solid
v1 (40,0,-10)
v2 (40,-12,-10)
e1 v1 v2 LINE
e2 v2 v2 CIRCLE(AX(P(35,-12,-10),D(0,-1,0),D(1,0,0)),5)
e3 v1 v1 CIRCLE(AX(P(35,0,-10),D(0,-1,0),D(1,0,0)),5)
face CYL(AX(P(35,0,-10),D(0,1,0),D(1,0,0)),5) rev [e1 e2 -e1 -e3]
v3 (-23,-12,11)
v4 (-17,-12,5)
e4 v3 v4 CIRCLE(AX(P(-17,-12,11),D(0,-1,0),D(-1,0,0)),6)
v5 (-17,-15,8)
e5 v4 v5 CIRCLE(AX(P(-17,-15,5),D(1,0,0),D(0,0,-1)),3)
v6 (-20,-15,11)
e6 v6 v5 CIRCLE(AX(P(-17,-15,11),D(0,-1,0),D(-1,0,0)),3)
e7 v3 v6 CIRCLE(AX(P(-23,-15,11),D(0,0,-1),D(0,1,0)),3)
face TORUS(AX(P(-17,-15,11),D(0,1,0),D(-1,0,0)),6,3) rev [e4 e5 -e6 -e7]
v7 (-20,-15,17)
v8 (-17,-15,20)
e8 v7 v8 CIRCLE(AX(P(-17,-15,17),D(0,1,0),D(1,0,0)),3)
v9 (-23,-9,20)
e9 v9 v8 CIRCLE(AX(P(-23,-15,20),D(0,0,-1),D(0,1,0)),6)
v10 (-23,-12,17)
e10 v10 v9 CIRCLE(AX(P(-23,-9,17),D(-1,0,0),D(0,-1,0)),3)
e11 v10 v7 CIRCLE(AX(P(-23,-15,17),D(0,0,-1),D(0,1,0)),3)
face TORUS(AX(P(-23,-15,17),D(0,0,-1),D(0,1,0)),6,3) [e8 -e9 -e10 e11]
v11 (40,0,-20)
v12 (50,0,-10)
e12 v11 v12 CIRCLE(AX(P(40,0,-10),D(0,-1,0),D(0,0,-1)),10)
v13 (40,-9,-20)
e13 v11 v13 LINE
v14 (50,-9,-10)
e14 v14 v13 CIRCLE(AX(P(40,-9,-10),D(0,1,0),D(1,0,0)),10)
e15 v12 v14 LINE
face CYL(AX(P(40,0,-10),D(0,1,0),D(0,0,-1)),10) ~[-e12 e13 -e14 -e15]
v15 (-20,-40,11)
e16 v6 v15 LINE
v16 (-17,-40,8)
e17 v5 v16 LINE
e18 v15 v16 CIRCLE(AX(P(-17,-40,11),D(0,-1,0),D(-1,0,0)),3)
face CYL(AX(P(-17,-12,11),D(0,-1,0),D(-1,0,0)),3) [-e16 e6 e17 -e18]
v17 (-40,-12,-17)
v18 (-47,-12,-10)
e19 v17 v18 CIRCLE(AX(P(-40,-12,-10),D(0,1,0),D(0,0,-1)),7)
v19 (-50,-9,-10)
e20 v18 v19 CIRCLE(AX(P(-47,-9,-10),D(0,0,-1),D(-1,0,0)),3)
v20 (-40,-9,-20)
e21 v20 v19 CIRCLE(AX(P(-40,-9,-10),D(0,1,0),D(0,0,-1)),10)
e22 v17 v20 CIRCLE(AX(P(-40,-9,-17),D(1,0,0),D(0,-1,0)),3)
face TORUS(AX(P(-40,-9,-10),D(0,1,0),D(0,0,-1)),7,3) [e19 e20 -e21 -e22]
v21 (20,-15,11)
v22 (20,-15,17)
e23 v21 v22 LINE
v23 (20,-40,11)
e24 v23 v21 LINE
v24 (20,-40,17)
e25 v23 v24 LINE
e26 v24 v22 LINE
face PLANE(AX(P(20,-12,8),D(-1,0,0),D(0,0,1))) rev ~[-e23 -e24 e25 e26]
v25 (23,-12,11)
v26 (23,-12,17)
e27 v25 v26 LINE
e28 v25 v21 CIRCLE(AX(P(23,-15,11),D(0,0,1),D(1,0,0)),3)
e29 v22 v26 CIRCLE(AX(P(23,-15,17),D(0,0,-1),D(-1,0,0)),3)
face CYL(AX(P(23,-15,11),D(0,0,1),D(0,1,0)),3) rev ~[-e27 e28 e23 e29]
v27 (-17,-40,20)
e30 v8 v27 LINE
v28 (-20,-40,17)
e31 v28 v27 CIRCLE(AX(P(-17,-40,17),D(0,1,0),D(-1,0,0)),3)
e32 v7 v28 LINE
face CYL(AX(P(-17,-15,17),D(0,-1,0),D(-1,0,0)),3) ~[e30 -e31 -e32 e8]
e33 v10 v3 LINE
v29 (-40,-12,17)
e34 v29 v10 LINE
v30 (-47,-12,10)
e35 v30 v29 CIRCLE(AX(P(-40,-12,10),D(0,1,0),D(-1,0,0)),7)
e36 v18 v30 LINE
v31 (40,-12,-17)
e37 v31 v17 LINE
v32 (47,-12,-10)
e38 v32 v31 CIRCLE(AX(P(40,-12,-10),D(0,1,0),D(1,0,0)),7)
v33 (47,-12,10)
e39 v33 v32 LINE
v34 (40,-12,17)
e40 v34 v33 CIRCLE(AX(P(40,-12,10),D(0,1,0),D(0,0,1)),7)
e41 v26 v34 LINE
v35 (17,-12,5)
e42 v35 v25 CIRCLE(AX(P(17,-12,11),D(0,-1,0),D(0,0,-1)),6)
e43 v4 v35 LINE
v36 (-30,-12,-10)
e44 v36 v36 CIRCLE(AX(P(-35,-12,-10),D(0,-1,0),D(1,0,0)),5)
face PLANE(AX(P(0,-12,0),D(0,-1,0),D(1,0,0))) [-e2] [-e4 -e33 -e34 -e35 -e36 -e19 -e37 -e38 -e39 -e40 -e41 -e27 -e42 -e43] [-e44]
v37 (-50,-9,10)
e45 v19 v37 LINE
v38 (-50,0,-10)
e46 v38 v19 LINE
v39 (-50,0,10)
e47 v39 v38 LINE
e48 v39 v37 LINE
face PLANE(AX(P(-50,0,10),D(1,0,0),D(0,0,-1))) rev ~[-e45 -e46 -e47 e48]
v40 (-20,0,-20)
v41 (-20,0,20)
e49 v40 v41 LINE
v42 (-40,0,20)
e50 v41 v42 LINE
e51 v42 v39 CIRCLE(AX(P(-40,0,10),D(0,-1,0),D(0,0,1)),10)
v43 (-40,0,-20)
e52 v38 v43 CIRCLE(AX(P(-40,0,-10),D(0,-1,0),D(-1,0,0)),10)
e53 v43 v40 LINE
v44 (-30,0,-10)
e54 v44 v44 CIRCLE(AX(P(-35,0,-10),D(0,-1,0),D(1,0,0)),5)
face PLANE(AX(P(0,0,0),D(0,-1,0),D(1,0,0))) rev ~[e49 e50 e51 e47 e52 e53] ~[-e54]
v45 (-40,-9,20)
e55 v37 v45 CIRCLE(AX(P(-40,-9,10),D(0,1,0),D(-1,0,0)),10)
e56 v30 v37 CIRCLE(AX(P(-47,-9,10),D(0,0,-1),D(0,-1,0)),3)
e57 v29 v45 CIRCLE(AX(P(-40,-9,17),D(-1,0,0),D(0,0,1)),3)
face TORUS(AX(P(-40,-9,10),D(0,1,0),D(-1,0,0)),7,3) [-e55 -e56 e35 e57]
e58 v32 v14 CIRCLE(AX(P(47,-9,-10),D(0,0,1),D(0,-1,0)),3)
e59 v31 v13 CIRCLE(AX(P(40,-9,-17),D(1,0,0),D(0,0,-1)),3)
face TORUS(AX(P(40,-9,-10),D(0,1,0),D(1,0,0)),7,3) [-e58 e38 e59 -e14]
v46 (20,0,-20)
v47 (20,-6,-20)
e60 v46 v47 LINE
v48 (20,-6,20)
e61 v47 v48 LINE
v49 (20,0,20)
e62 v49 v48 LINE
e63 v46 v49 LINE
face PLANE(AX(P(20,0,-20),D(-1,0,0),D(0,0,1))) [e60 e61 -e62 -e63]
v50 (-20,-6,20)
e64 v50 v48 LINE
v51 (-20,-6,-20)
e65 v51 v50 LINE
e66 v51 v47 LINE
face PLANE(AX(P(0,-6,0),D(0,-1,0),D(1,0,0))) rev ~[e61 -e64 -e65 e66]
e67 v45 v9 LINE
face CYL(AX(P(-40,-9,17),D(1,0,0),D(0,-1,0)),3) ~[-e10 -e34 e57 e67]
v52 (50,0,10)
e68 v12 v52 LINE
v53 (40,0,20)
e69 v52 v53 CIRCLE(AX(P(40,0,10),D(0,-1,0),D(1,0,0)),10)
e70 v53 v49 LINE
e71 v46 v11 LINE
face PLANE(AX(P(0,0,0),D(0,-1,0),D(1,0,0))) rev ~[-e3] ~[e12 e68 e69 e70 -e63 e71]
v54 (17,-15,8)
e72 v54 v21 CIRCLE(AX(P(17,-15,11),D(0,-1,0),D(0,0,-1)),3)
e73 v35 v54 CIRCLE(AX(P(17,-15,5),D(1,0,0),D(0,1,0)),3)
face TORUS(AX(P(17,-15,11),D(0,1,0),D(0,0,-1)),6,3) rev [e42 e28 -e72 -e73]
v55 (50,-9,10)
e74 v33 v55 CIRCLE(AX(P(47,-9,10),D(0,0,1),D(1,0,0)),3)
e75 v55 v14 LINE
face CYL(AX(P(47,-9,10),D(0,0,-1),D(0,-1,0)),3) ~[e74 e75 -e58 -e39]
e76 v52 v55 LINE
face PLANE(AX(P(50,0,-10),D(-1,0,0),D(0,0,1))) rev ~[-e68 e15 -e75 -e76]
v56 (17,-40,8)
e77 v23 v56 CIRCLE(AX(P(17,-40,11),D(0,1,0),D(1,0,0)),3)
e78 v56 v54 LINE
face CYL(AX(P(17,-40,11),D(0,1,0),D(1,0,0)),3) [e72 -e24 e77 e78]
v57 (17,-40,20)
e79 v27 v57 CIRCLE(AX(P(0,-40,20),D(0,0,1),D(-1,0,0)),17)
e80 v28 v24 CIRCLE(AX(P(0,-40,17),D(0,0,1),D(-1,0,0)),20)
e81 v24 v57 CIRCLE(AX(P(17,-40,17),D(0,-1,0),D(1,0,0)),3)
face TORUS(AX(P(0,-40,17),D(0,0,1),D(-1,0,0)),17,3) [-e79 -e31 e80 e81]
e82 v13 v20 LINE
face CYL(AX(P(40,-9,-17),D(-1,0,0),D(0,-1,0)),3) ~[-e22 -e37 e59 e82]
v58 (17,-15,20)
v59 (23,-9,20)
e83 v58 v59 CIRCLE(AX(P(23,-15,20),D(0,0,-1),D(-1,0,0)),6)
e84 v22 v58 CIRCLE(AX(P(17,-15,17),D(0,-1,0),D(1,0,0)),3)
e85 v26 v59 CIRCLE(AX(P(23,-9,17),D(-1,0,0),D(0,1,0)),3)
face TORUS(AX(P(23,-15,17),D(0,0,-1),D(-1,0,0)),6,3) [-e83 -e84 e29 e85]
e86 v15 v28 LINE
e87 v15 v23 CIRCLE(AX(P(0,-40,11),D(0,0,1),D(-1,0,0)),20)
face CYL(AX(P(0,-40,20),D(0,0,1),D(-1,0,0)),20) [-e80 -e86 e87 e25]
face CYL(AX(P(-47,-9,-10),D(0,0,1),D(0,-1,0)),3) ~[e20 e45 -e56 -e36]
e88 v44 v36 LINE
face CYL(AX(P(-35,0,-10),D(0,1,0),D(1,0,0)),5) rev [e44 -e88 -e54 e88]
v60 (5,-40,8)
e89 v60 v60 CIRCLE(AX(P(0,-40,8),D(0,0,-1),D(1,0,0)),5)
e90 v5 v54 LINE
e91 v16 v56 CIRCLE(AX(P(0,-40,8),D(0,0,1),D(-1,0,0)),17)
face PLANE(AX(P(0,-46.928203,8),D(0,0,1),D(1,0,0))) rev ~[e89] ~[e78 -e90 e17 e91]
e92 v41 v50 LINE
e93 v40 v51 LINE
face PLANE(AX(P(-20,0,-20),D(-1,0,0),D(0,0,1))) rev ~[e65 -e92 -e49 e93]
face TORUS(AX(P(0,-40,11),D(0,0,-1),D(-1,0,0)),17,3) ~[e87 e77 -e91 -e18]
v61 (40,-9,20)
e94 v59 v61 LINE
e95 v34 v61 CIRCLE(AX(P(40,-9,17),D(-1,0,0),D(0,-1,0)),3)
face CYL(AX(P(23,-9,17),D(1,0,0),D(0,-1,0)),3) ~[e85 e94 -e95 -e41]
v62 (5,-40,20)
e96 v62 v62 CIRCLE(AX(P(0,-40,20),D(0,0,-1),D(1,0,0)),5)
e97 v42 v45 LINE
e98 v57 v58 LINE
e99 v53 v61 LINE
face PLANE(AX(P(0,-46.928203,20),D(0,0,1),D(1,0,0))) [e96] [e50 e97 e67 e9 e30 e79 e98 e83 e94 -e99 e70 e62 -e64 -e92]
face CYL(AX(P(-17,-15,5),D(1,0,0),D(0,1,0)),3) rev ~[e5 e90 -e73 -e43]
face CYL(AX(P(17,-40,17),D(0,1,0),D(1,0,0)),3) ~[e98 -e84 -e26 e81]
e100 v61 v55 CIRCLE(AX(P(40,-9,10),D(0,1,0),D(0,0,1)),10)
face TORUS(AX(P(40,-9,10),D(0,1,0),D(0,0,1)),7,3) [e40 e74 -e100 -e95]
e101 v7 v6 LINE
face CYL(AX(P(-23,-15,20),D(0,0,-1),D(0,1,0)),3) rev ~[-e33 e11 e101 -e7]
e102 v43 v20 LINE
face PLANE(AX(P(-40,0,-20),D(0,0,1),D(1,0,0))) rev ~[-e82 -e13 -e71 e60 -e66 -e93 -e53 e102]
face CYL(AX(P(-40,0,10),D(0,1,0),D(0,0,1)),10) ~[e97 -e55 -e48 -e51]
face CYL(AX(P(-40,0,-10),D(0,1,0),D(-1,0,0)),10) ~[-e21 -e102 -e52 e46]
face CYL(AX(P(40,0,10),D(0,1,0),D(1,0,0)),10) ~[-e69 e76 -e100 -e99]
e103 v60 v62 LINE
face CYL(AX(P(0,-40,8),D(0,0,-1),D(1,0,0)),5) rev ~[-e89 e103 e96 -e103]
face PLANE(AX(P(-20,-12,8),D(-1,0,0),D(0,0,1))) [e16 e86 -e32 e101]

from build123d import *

# Parameters (mm, degrees)
F0_R      = 5
F1_DEPTH  = 12
F2_W      = 40
F2_H      = 40
F3_DEPTH  = 6
F4_W      = 40
F4_H      = 12
F5_DEPTH  = 28
F7_DEPTH  = 12
F8_F1_R   = 3
F8_F2_R   = 3
F9_R      = 3
F10_R     = 5
F11_DEPTH = 25


with BuildPart() as f1:
    # F0 (on Front) → F1 (new body)
    with BuildSketch(Plane.XZ):
        with BuildLine():
            Line((40, 20), (-40, 20))
            ThreePointArc((-40, 20), (-47.0710678119, 17.0710678119), (-50, 10))
            Line((-50, 10), (-50, -10))
            ThreePointArc((-50, -10), (-47.0710678119, -17.0710678119), (-40, -20))
            Line((-40, -20), (40, -20))
            ThreePointArc((40, -20), (47.0710678119, -17.0710678119), (50, -10))
            Line((50, -10), (50, 10))
            ThreePointArc((50, 10), (47.0710678119, 17.0710678119), (40, 20))
        make_face()
        with Locations((-35, -10)):
            Circle(F0_R, mode=Mode.SUBTRACT)
        with Locations((35, -10)):
            Circle(F0_R, mode=Mode.SUBTRACT)
    extrude(amount=F1_DEPTH)

    # F2 (on Front) → F3 (cut)
    with BuildSketch(Plane.XZ):
        Rectangle(F2_W, F2_H)
    extrude(amount=F3_DEPTH, mode=Mode.SUBTRACT)

    # F4 (on face) → F5 (join)
    with BuildSketch(Plane.XZ.offset(12)):
        with Locations((0, 14)):
            Rectangle(F4_W, F4_H)
    extrude(amount=F5_DEPTH)

    # F6 (on face) → F7 (join)
    with BuildSketch(Plane.XY.offset(20)):
        with BuildLine():
            Line((20, -40), (-20, -40))
            ThreePointArc((-20, -40), (0, -60), (20, -40))
        make_face()
    extrude(amount=-F7_DEPTH)

    # F8: fillet of radius 3 on 4 edges, made by hand

    # F8_f1
    f8_f1_edges = [f1.edges().sort_by_distance(p)[0] for p in [
        (-20, -26, 8),
        (0, -60, 8),
        (20, -26, 8),
    ]]
    fillet(f8_f1_edges, radius=F8_F1_R)

    # F8_f2
    f8_f2_edges = [f1.edges().sort_by_distance(p)[0] for p in [
        (0, -12, 8),
        (-19.1213203436, -12, 8.8786796564),
        (19.1213203436, -12, 8.8786796564),
    ]]
    fillet(f8_f2_edges, radius=F8_F2_R)

    # F9
    f9_edges = [f1.edges().sort_by_distance(p)[0] for p in [
        (-20, -40, 15.5),
        (0, -60, 11),
        (0, -60, 20),
        (20, -40, 15.5),
        (-31.5, -12, 20),
        (-47.071068, -12, 17.071068),
        (-50, -12, 0),
        (-47.071068, -12, -17.071068),
        (0, -12, -20),
        (47.071068, -12, -17.071068),
        (31.5, -12, 20),
        (50, -12, 0),
        (47.071068, -12, 17.071068),
        (20.87868, -12.87868, 20),
        (20, -27.5, 20),
        (-20, -27.5, 20),
        (-20.87868, -12.87868, 20),
    ]]
    fillet(f9_edges, radius=F9_R)

    # F10 (on face) → F11 (cut)
    with BuildSketch(Plane(origin=(0, 0, 8), x_dir=(1, 0, 0), z_dir=(0, 0, -1))):
        with Locations((0, 40)):
            Circle(F10_R)
    extrude(amount=-F11_DEPTH, mode=Mode.SUBTRACT)


solid = f1.part
